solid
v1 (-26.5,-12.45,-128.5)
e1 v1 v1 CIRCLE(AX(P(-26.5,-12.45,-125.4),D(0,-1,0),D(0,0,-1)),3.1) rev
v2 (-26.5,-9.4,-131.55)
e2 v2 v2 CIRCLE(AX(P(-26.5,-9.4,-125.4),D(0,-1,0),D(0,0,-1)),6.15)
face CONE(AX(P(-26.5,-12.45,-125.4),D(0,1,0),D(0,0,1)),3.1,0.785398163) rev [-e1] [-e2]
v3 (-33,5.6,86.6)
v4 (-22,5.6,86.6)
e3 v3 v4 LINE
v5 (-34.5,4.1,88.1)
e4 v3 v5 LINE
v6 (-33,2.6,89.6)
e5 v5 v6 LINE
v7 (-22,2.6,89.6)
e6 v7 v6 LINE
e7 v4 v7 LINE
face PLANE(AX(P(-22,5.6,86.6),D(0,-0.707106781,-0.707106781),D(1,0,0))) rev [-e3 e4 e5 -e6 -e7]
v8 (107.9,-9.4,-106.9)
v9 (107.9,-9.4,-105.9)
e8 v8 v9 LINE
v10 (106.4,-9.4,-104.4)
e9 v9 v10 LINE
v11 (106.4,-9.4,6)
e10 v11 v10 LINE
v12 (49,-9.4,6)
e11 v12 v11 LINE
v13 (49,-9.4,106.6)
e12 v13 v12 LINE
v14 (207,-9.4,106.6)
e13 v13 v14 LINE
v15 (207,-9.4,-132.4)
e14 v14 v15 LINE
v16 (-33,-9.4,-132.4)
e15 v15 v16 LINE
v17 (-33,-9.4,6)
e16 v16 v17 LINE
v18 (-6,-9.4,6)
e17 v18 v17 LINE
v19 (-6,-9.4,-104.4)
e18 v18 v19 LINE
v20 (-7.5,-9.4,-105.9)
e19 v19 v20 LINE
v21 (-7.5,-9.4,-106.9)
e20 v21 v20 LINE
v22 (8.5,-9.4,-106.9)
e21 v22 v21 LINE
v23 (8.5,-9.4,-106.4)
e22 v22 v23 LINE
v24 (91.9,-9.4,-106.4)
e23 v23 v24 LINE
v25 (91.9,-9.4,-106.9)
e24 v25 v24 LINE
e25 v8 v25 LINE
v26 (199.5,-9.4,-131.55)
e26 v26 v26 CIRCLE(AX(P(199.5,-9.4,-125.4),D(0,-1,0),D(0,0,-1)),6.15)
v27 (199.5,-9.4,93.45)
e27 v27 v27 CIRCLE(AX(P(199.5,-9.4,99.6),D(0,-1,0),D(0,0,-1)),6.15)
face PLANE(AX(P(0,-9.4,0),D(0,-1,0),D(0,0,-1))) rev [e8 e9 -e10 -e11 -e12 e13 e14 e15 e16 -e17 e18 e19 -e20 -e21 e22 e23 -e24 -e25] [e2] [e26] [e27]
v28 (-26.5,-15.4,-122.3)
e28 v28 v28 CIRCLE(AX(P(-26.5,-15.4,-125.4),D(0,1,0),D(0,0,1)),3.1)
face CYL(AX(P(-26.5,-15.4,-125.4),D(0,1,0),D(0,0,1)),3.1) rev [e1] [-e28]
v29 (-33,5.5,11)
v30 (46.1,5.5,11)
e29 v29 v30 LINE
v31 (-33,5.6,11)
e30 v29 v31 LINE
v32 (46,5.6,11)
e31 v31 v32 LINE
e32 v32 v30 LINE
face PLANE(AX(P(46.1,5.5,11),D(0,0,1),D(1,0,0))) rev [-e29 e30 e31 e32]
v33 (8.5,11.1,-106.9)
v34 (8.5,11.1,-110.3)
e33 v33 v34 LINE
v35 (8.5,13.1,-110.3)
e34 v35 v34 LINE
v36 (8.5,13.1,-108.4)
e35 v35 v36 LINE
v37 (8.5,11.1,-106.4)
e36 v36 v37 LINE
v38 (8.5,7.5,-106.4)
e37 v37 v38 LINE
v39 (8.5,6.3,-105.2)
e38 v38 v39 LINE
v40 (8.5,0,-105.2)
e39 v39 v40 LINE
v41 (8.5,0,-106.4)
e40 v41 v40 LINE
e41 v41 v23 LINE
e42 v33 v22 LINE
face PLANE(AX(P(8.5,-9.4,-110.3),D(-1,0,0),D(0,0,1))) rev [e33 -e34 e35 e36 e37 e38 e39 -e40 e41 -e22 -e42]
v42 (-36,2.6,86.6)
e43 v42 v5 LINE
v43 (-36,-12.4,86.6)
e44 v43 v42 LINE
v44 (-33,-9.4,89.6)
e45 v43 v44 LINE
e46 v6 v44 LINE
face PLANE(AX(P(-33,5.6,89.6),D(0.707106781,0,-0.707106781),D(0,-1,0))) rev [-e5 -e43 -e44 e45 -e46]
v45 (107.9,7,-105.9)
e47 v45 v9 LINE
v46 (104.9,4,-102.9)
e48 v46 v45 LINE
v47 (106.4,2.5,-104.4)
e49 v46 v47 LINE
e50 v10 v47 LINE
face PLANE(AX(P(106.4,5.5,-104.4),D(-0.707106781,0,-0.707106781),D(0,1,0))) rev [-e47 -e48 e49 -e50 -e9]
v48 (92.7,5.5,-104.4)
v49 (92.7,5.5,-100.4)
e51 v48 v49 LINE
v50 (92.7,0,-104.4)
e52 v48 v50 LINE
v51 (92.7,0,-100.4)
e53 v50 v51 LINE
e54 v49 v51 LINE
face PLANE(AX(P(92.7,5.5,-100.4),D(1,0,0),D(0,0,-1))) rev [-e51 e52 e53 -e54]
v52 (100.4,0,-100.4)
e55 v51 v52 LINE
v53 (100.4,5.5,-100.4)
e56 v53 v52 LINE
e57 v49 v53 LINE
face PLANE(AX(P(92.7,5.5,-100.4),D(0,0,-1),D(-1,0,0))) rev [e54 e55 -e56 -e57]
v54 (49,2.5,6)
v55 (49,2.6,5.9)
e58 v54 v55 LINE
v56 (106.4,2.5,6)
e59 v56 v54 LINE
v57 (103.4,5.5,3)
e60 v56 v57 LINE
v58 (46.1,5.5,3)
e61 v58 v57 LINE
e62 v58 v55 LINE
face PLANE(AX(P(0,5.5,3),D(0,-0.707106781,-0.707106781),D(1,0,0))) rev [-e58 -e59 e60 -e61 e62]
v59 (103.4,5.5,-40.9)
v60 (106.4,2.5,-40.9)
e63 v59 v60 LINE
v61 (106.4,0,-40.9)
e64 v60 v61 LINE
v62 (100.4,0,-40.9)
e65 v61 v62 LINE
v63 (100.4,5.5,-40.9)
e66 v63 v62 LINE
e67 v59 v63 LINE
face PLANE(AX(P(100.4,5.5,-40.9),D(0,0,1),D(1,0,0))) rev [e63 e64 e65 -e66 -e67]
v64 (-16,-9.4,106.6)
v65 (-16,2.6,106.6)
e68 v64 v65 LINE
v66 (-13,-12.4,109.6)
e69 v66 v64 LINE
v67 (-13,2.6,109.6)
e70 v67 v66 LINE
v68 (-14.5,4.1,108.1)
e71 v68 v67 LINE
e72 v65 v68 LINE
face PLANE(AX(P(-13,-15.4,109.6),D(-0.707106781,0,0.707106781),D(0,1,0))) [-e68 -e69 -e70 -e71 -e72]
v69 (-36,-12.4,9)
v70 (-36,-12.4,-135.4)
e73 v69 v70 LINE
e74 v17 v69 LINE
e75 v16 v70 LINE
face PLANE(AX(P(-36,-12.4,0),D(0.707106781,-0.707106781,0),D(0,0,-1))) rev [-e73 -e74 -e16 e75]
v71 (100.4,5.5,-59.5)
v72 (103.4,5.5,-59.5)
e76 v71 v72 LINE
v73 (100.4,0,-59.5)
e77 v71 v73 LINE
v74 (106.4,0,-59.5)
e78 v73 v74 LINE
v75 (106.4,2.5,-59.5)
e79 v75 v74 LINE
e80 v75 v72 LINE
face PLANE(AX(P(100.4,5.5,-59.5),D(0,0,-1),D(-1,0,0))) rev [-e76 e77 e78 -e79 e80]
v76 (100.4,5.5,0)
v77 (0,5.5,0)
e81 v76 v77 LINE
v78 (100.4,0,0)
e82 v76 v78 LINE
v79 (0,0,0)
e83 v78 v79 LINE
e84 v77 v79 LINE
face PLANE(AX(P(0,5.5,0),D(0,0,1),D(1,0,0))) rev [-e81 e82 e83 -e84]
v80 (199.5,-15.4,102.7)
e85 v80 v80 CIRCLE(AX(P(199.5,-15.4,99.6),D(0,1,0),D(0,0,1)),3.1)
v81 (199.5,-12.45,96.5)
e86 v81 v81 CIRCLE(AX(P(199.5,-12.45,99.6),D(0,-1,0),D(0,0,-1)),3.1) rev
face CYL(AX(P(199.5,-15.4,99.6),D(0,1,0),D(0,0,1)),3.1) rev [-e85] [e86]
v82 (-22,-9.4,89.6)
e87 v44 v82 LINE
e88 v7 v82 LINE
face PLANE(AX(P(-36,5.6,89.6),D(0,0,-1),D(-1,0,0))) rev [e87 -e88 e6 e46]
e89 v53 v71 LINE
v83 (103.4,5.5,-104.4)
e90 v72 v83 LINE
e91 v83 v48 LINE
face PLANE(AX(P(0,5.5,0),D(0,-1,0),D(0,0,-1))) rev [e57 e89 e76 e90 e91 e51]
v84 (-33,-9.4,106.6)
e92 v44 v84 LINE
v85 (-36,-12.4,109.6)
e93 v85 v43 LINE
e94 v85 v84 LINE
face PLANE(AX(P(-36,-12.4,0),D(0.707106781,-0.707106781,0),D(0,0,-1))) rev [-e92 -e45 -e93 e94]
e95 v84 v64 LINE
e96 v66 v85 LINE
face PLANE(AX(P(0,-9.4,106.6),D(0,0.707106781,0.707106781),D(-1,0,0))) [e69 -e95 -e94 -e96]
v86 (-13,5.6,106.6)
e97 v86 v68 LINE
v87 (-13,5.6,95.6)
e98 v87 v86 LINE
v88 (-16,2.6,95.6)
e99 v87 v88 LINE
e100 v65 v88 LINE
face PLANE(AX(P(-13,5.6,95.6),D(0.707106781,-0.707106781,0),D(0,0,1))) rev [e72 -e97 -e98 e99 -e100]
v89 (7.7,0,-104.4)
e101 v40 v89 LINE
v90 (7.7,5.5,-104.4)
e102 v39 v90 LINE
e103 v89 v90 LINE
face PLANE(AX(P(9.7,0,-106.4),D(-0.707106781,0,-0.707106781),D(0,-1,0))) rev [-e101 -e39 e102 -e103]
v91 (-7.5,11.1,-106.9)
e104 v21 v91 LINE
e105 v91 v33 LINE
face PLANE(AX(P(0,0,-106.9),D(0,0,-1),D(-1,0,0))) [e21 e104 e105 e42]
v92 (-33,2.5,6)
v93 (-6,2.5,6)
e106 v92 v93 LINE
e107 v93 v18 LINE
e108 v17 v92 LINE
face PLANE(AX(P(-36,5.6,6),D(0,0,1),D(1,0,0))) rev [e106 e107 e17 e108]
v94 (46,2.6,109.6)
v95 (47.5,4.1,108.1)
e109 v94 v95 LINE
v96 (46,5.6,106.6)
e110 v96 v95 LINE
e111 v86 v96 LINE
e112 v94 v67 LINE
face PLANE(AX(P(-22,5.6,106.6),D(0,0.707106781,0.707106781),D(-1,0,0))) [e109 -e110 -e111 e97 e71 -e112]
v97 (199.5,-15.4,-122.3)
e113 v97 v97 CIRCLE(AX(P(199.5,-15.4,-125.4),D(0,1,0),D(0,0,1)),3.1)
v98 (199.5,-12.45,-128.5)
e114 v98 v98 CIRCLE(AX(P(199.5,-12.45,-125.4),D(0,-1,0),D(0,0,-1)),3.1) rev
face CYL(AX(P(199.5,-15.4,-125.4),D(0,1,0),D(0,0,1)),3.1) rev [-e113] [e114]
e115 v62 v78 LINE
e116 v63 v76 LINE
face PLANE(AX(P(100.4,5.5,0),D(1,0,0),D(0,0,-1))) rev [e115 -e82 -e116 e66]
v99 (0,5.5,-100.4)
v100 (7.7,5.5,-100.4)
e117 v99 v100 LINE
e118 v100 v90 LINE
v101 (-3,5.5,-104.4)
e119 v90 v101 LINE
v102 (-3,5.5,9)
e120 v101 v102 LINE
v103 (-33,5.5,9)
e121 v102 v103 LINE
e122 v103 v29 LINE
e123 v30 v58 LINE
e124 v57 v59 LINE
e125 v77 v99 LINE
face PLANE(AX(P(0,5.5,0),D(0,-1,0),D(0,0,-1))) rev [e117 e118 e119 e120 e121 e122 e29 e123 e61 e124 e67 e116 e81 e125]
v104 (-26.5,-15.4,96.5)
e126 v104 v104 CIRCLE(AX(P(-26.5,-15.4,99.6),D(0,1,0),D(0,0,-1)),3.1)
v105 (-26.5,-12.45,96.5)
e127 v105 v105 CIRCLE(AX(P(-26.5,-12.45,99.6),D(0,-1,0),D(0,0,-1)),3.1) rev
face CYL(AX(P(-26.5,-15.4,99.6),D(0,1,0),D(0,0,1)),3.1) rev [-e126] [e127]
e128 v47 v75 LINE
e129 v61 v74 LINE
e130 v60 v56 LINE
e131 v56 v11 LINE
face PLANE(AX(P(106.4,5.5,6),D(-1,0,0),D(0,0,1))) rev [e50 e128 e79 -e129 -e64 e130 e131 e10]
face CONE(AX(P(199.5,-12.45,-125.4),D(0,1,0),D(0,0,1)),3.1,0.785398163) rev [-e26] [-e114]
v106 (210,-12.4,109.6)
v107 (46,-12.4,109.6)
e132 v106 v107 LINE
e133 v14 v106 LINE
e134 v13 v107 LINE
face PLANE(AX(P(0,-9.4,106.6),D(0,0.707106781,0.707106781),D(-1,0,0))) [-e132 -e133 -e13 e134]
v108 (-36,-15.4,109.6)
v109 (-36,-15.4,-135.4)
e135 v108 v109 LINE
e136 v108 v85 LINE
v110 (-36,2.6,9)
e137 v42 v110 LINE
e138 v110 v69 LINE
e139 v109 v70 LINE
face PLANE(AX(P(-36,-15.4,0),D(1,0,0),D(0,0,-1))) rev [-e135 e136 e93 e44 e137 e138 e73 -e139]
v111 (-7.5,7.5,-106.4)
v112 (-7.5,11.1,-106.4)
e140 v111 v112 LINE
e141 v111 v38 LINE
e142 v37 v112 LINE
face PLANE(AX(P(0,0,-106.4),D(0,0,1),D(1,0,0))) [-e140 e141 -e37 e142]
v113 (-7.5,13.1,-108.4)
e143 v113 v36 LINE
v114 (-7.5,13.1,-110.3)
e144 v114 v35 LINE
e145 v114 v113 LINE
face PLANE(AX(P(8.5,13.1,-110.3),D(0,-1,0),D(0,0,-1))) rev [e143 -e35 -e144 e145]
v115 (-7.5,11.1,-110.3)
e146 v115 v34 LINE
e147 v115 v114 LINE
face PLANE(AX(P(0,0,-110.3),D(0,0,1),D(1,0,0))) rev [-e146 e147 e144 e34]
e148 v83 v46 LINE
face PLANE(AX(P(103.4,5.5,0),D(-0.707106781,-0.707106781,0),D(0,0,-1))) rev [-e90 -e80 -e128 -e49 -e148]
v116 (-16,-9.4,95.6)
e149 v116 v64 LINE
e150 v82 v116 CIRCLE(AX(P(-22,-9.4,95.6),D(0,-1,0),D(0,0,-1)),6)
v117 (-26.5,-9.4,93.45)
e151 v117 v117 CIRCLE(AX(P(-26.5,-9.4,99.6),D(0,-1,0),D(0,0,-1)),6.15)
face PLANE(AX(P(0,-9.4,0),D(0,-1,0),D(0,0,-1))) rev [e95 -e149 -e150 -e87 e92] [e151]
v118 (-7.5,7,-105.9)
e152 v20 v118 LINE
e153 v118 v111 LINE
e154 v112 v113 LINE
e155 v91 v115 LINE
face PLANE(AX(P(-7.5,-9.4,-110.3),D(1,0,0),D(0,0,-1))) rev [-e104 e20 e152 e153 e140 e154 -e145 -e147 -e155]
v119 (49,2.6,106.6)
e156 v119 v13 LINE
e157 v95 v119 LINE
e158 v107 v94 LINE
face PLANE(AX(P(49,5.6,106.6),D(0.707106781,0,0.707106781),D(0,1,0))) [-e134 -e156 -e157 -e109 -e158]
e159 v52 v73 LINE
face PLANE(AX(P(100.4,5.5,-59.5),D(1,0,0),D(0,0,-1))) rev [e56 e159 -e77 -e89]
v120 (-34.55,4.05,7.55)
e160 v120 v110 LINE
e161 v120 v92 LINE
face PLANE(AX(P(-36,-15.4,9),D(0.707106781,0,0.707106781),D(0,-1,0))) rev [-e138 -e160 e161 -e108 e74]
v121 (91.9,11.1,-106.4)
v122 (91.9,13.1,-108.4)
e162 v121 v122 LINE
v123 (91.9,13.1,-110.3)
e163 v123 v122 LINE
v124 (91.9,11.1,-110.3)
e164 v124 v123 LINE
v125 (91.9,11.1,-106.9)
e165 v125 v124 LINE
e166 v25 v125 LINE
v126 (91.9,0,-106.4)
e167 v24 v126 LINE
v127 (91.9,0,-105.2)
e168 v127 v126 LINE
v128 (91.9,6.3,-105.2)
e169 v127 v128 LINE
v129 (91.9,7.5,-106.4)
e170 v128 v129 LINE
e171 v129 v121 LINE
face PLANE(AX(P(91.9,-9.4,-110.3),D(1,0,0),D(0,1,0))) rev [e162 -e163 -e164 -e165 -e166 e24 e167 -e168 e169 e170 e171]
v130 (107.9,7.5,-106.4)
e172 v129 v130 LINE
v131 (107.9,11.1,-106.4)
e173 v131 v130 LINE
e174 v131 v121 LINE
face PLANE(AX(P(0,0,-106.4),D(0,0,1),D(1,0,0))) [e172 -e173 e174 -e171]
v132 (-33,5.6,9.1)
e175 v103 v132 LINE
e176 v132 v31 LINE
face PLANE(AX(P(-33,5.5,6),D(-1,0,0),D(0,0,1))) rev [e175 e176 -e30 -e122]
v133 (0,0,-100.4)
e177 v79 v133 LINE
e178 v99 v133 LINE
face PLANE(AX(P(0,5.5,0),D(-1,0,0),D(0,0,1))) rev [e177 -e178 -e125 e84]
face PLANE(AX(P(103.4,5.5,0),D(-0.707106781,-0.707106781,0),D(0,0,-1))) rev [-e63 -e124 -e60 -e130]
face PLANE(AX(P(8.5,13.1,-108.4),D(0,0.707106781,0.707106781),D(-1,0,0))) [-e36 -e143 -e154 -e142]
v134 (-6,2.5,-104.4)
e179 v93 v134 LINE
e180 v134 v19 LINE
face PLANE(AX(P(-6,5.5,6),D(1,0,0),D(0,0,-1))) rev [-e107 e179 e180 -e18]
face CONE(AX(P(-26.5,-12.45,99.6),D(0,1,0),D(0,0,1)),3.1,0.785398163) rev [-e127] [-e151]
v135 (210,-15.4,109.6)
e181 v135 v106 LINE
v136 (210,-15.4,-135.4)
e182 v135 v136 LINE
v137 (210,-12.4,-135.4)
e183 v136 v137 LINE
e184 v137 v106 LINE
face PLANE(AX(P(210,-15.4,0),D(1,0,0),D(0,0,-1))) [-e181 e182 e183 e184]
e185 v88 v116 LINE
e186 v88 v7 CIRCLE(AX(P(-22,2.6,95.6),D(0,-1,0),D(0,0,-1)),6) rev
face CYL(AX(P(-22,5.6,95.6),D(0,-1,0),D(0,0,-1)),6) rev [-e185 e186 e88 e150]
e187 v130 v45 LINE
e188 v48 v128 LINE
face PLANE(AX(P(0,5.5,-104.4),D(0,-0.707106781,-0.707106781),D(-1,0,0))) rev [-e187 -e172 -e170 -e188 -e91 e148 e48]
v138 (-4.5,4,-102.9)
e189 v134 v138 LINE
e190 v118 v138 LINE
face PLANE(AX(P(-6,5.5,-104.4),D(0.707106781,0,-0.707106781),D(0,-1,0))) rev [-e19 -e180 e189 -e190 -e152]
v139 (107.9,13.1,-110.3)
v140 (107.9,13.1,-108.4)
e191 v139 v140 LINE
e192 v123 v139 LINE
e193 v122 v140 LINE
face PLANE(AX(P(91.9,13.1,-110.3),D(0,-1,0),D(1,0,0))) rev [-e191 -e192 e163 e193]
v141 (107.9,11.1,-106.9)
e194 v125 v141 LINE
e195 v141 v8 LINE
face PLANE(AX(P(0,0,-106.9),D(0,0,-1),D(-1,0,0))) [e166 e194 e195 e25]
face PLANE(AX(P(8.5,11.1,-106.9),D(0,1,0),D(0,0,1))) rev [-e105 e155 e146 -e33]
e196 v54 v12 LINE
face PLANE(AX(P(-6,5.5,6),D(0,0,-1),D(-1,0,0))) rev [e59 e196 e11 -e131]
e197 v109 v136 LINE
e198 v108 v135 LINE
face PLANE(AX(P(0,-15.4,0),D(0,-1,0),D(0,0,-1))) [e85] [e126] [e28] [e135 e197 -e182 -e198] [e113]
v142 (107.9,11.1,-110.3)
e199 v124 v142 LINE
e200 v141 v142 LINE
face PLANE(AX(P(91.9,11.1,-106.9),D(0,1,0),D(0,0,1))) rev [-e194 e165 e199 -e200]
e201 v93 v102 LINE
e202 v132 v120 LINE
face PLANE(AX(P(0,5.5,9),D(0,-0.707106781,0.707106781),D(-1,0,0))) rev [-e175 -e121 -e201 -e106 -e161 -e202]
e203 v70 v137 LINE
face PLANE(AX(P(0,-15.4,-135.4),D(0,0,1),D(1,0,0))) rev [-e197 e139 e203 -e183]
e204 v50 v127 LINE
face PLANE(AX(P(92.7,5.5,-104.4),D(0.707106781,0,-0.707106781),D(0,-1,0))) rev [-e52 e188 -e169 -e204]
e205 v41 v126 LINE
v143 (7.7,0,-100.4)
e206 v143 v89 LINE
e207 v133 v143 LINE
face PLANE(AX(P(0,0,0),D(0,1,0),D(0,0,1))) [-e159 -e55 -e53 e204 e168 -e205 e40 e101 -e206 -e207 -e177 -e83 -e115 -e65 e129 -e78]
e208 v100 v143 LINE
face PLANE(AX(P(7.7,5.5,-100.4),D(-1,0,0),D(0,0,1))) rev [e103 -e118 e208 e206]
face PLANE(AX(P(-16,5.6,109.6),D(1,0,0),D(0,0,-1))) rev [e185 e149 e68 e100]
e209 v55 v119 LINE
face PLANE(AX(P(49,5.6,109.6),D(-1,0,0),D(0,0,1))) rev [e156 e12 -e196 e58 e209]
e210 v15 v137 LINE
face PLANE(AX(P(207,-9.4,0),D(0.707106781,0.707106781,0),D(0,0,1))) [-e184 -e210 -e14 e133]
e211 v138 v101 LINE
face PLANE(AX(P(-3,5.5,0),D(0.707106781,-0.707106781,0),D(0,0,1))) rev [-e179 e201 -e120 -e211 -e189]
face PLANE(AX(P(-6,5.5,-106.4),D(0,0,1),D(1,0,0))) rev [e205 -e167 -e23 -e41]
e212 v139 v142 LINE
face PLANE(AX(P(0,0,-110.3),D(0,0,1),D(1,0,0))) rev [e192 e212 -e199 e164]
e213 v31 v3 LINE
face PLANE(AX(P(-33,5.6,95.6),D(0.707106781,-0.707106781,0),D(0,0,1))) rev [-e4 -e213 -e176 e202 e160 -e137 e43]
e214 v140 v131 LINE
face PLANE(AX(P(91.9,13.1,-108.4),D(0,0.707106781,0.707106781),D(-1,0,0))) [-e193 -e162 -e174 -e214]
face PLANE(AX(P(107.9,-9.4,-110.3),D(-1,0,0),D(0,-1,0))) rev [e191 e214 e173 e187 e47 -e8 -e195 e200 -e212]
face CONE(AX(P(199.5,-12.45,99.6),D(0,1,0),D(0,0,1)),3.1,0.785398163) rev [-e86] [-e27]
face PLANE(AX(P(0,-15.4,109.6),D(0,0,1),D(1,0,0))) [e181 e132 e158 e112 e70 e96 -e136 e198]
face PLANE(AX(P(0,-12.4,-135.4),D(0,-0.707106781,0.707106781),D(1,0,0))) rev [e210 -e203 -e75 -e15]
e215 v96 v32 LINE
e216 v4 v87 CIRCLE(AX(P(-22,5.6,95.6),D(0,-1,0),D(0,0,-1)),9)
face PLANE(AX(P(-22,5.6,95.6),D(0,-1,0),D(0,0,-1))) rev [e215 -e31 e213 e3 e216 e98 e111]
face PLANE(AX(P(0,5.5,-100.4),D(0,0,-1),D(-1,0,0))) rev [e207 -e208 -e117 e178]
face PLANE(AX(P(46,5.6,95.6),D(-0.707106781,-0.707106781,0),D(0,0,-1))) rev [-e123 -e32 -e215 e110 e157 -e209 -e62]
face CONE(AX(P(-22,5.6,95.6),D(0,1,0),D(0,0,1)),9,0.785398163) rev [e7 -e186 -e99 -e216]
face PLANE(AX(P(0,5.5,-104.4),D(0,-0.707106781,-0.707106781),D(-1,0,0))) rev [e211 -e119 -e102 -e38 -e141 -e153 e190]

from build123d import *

# Parameters (mm, degrees)
BOSS_EXTRUDE1_DEPTH   = 5.5
BOSS_EXTRUDE1_2_DEPTH = 5.5
SKETCH2_W             = 112.4
SKETCH2_H             = 112.4
BOSS_EXTRUDE2_DEPTH   = 9.4
BOSS_EXTRUDE3_START   = 9.4
SKETCH2_3_W           = 246
SKETCH2_3_H           = 245
BOSS_EXTRUDE3_DEPTH   = 6
SKETCH3_R             = 3.1
CUT_EXTRUDE1_DEPTH    = 251.310147617
BOSS_EXTRUDE4_DEPTH   = 15
SKETCH5_W             = 16
SKETCH5_H             = 22.5
BOSS_EXTRUDE5_DEPTH   = 3.9
SKETCH6_W             = 16
SKETCH6_H             = 20.5
CUT_EXTRUDE2_DEPTH    = 3.4
CHAMFER1_SIZE         = 2
CHAMFER2_SIZE         = 3.05
CHAMFER3_SIZE         = 3
CHAMFER4_SIZE         = 3
SKETCH8_W             = 79.1
SKETCH8_H             = 5
CUT_EXTRUDE3_DEPTH    = 0.1


with BuildPart() as part:
    # Sketch1 → Boss-Extrude1 (new body)
    with BuildSketch(Plane(origin=(0, 0, 0), x_dir=(1, 0, 0), z_dir=(0, 1, 0))):
        Polygon((-6, -6), (-6, 106.4), (7.7, 106.4), (7.7, 100.4), (0, 100.4), (0, 0), (100.4, 0), (100.4, 40.9), (106.4, 40.9), (106.4, -6), align=None)
    extrude(amount=BOSS_EXTRUDE1_DEPTH)



with BuildPart() as body_2:
    # Sketch1 → Boss-Extrude1 2 (new body)
    with BuildSketch(Plane(origin=(0, 0, 0), x_dir=(1, 0, 0), z_dir=(0, 1, 0))):
        Polygon((92.7, 100.4), (92.7, 106.4), (106.4, 106.4), (106.4, 59.5), (100.4, 59.5), (100.4, 100.4), align=None)
    extrude(amount=BOSS_EXTRUDE1_2_DEPTH)


with BuildPart() as part_1:
    add(part.part)

    add(body_2.part)  # Boss-Extrude2 merges body 2
    # Sketch2 → Boss-Extrude2 (add)
    with BuildSketch(Plane.XZ):
        with Locations((50.2, -50.2)):
            Rectangle(SKETCH2_W, SKETCH2_H)
    extrude(amount=BOSS_EXTRUDE2_DEPTH)

    # Sketch2<3> → Boss-Extrude3 (add)
    with BuildSketch(Plane.XZ.offset(BOSS_EXTRUDE3_START)):
        with Locations((87, -12.9)):
            Rectangle(SKETCH2_3_W, SKETCH2_3_H)
    extrude(amount=BOSS_EXTRUDE3_DEPTH)

    # Sketch3 → Cut-Extrude1 (cut, through all)
    with BuildSketch(Plane(origin=(0, -9.4, 0), x_dir=(1, 0, 0), z_dir=(0, 1, 0))):
        with Locations(Location((-26.5, 125.4, 0), (0, 0, 270))):
            Circle(SKETCH3_R)
        with Locations(Location((-26.5, -99.6, 0), (0, 0, 90))):
            Circle(SKETCH3_R)
        with Locations(Location((199.5, 125.4, 0), (0, 0, 270))):
            Circle(SKETCH3_R)
        with Locations(Location((199.5, -99.6, 0), (0, 0, 270))):
            Circle(SKETCH3_R)
    extrude(amount=-CUT_EXTRUDE1_DEPTH, mode=Mode.SUBTRACT)

    # Sketch4 → Boss-Extrude4 (add)
    with BuildSketch(Plane(origin=(0, -9.4, 0), x_dir=(1, 0, 0), z_dir=(0, 1, 0))):
        with BuildLine():
            Line((-16, -109.6), (49, -109.6))
            Line((49, -109.6), (49, -6))
            Line((49, -6), (-36, -6))
            Line((-36, -6), (-36, -89.6))
            Line((-36, -89.6), (-22, -89.6))
            ThreePointArc((-22, -89.6), (-17.757359313, -91.357359313), (-16, -95.6))
            Line((-16, -95.6), (-16, -109.6))
        make_face()
    extrude(amount=BOSS_EXTRUDE4_DEPTH)

    # Sketch5 → Boss-Extrude5 (add)
    with BuildSketch(Plane(origin=(0, 0, -106.4), x_dir=(-1, 0, 0), z_dir=(0, 0, -1))):
        with Locations((-99.9, 1.85)):
            Rectangle(SKETCH5_W, SKETCH5_H)
        with Locations((-0.5, 1.85)):
            Rectangle(SKETCH5_W, SKETCH5_H)
    extrude(amount=BOSS_EXTRUDE5_DEPTH)

    # Sketch6 → Cut-Extrude2 (cut)
    with BuildSketch(Plane(origin=(0, 0, -110.3), x_dir=(-1, 0, 0), z_dir=(0, 0, -1))):
        with Locations((-0.5, 0.85)):
            Rectangle(SKETCH6_W, SKETCH6_H)
        with Locations((-99.9, 0.85)):
            Rectangle(SKETCH6_W, SKETCH6_H)
    extrude(amount=-CUT_EXTRUDE2_DEPTH, mode=Mode.SUBTRACT)

    # Chamfer1
    # the kernel refuses this chamfer: 2 mm, written as the material it adds along each edge
    with BuildSketch(Plane(origin=(92.7, -5.143365976, -106.4), x_dir=(-0.9996219169112968, 0, -0.027495876610589005), z_dir=(0, 1, 0))) as chamfer1_piece_1_section:
        Polygon((CHAMFER1_SIZE * 0.999621916911, CHAMFER1_SIZE * 0.0274958766106), (-CHAMFER1_SIZE * 0.0274958766106, CHAMFER1_SIZE * 0.999621916911), (0, 0), align=None)
    chamfer1_piece_1 = extrude(amount=10.643365976, mode=Mode.PRIVATE)
    chamfer1_piece_1 = split(chamfer1_piece_1, bisect_by=Plane(origin=(91.9, -2.571682988, -105.57221902), z_dir=(1, 0, 0)), keep=Keep.TOP, mode=Mode.PRIVATE)
    add(chamfer1_piece_1)
    with BuildSketch(Plane(origin=(92.7, 5.5, -106.4), x_dir=(0, 0.9996219169112968, -0.027495876610589075), z_dir=(1, 0, 0)), Plane(origin=(-6, 5.5, -106.4), x_dir=(0, 0.9996219169112968, -0.027495876610589075), z_dir=(1, 0, 0))) as chamfer1_piece_2:
        Polygon((CHAMFER1_SIZE * 0.999621916911, CHAMFER1_SIZE * 0.0274958766106), (-CHAMFER1_SIZE * 0.0274958766106, CHAMFER1_SIZE * 0.999621916911), (0, 0), align=None)
    extrude(amount=13.7)
    with BuildSketch(Plane(origin=(106.4, 5.5, -106.4), x_dir=(-0.027495876610589005, 0, 0.9996219169112968), z_dir=(0, -1, 0))) as chamfer1_piece_3_section:
        Polygon((CHAMFER1_SIZE * 0.999621916911, -CHAMFER1_SIZE * 0.0274958766106), (-CHAMFER1_SIZE * 0.0274958766106, -CHAMFER1_SIZE * 0.999621916911), (0, 0), align=None)
    chamfer1_piece_3 = extrude(amount=14.9, mode=Mode.PRIVATE)
    chamfer1_piece_3 = split(chamfer1_piece_3, bisect_by=Plane(origin=(107.9, -1.95, -105.69608178), z_dir=(-1, 0, 0)), keep=Keep.TOP, mode=Mode.PRIVATE)
    add(chamfer1_piece_3)
    with BuildSketch(Plane(origin=(106.4, 5.5, -106.4), x_dir=(-0.027495876610589005, 0, 0.9996219169112968), z_dir=(0, -1, 0))) as chamfer1_piece_4_section:
        Polygon((CHAMFER1_SIZE * 0.999621916911, -CHAMFER1_SIZE * 0.0274958766106), (-CHAMFER1_SIZE * 0.0274958766106, -CHAMFER1_SIZE * 0.999621916911), (0, 0), align=None)
    chamfer1_piece_4 = extrude(amount=20.043365976, mode=Mode.PRIVATE)
    chamfer1_piece_4 = split(chamfer1_piece_4, bisect_by=Plane(origin=(106.974972825, -9.4, -105.69608178), z_dir=(0, -1, 0)), keep=Keep.TOP, mode=Mode.PRIVATE)
    chamfer1_piece_4 = split(chamfer1_piece_4, bisect_by=Plane(origin=(107.9, -11.971682988, -105.69608178), z_dir=(-1, 0, 0)), keep=Keep.TOP, mode=Mode.PRIVATE)
    add(chamfer1_piece_4)
    with BuildSketch(Plane(origin=(106.4, 5.5, -106.4), x_dir=(-0.027495876610589005, 0, 0.9996219169112968), z_dir=(0, -1, 0))) as chamfer1_piece_5_section:
        Polygon((CHAMFER1_SIZE * 0.999621916911, -CHAMFER1_SIZE * 0.0274958766106), (-CHAMFER1_SIZE * 0.0274958766106, -CHAMFER1_SIZE * 0.999621916911), (0, 0), align=None)
    chamfer1_piece_5 = extrude(amount=20.043365976, mode=Mode.PRIVATE)
    chamfer1_piece_5 = split(chamfer1_piece_5, bisect_by=Plane(origin=(108.09753906, -9.4, -106.284213701), z_dir=(0, -1, 0)), keep=Keep.TOP, mode=Mode.PRIVATE)
    chamfer1_piece_5 = split(chamfer1_piece_5, bisect_by=Plane(origin=(107.9, -11.971682988, -106.284213701), z_dir=(1, 0, 0)), keep=Keep.TOP, mode=Mode.PRIVATE)
    add(chamfer1_piece_5)
    with BuildSketch(Plane(origin=(7.7, -5.143365976, -106.4), x_dir=(0.9996219169112965, 0, -0.027495876610589057), z_dir=(0, 1, 0))) as chamfer1_piece_6_section:
        Polygon((CHAMFER1_SIZE * 0.999621916911, -CHAMFER1_SIZE * 0.0274958766106), (-CHAMFER1_SIZE * 0.0274958766106, -CHAMFER1_SIZE * 0.999621916911), (0, 0), align=None)
    chamfer1_piece_6 = extrude(amount=10.643365976, mode=Mode.PRIVATE)
    chamfer1_piece_6 = split(chamfer1_piece_6, bisect_by=Plane(origin=(8.5, -2.571682988, -105.57221902), z_dir=(-1, 0, 0)), keep=Keep.TOP, mode=Mode.PRIVATE)
    add(chamfer1_piece_6)
    with BuildSketch(Plane(origin=(-6, 5.5, -106.4), x_dir=(-0.9996219169112968, 0, -0.027495876610589075), z_dir=(0, -1, 0))) as chamfer1_piece_7_section:
        Polygon((CHAMFER1_SIZE * 0.999621916911, -CHAMFER1_SIZE * 0.0274958766106), (-CHAMFER1_SIZE * 0.0274958766106, -CHAMFER1_SIZE * 0.999621916911), (0, 0), align=None)
    chamfer1_piece_7 = extrude(amount=14.9, mode=Mode.PRIVATE)
    chamfer1_piece_7 = split(chamfer1_piece_7, bisect_by=Plane(origin=(-7.5, -1.95, -105.69608178), z_dir=(1, 0, 0)), keep=Keep.TOP, mode=Mode.PRIVATE)
    add(chamfer1_piece_7)
    with BuildSketch(Plane(origin=(-6, 5.5, -106.4), x_dir=(-0.9996219169112968, 0, -0.027495876610589075), z_dir=(0, -1, 0))) as chamfer1_piece_8_section:
        Polygon((CHAMFER1_SIZE * 0.999621916911, -CHAMFER1_SIZE * 0.0274958766106), (-CHAMFER1_SIZE * 0.0274958766106, -CHAMFER1_SIZE * 0.999621916911), (0, 0), align=None)
    chamfer1_piece_8 = extrude(amount=20.043365976, mode=Mode.PRIVATE)
    chamfer1_piece_8 = split(chamfer1_piece_8, bisect_by=Plane(origin=(-7.69753906, -9.4, -106.284213701), z_dir=(0, -1, 0)), keep=Keep.TOP, mode=Mode.PRIVATE)
    chamfer1_piece_8 = split(chamfer1_piece_8, bisect_by=Plane(origin=(-7.5, -11.971682988, -106.284213701), z_dir=(-1, 0, 0)), keep=Keep.TOP, mode=Mode.PRIVATE)
    add(chamfer1_piece_8)
    with BuildSketch(Plane(origin=(-6, 5.5, -106.4), x_dir=(-0.9996219169112968, 0, -0.027495876610589075), z_dir=(0, -1, 0))) as chamfer1_piece_9_section:
        Polygon((CHAMFER1_SIZE * 0.999621916911, -CHAMFER1_SIZE * 0.0274958766106), (-CHAMFER1_SIZE * 0.0274958766106, -CHAMFER1_SIZE * 0.999621916911), (0, 0), align=None)
    chamfer1_piece_9 = extrude(amount=20.043365976, mode=Mode.PRIVATE)
    chamfer1_piece_9 = split(chamfer1_piece_9, bisect_by=Plane(origin=(-6.574972825, -9.4, -105.69608178), z_dir=(0, -1, 0)), keep=Keep.TOP, mode=Mode.PRIVATE)
    chamfer1_piece_9 = split(chamfer1_piece_9, bisect_by=Plane(origin=(-7.5, -11.971682988, -105.69608178), z_dir=(1, 0, 0)), keep=Keep.TOP, mode=Mode.PRIVATE)
    add(chamfer1_piece_9)
    with BuildSketch(Plane(origin=(87.556634024, 5.5, -106.4), x_dir=(0, 0.9996219169112968, -0.027495876610589075), z_dir=(1, 0, 0))) as chamfer1_piece_10a_section:
        Polygon((CHAMFER1_SIZE * 0.999621916911, CHAMFER1_SIZE * 0.0274958766106), (-CHAMFER1_SIZE * 0.0274958766106, CHAMFER1_SIZE * 0.999621916911), (0, 0), align=None)
    chamfer1_piece_10a = extrude(amount=18.843365976, mode=Mode.PRIVATE)
    chamfer1_piece_10a = split(chamfer1_piece_10a, bisect_by=Plane(origin=(91.9, 6.159587254, -105.740412746), z_dir=(1, 0, 0)), keep=Keep.TOP, mode=Mode.PRIVATE)
    chamfer1_piece_10a = split(chamfer1_piece_10a, bisect_by=Plane(origin=(92.7, 6.159587254, -105.740412746), z_dir=(-1, 0, 0)), keep=Keep.TOP, mode=Mode.PRIVATE)
    with BuildSketch(Plane(origin=(92.7, 0, -106.4), x_dir=(-0.9996219169112968, 0, -0.027495876610589005), z_dir=(0, 1, 0))) as chamfer1_piece_10b_section:
        Polygon((CHAMFER1_SIZE * 0.999621916911, CHAMFER1_SIZE * 0.0274958766106), (-CHAMFER1_SIZE * 0.0274958766106, CHAMFER1_SIZE * 0.999621916911), (0, 0), align=None)
    chamfer1_piece_10b = extrude(amount=10.643365976, mode=Mode.PRIVATE)
    chamfer1_piece_10b = split(chamfer1_piece_10b, bisect_by=Plane(origin=(91.9, 8.071682988, -105.57221902), z_dir=(1, 0, 0)), keep=Keep.TOP, mode=Mode.PRIVATE)
    chamfer1_piece_10b = split(chamfer1_piece_10b, bisect_by=Plane(origin=(92.36112716, 5.5, -105.57221902), z_dir=(0, 1, 0)), keep=Keep.TOP, mode=Mode.PRIVATE)
    chamfer1_piece_10 = chamfer1_piece_10a & chamfer1_piece_10b
    add(chamfer1_piece_10)
    with BuildSketch(Plane(origin=(106.4, 10.643365976, -106.4), x_dir=(-0.027495876610589005, 0, 0.9996219169112968), z_dir=(0, -1, 0))) as chamfer1_piece_11a_section:
        Polygon((CHAMFER1_SIZE * 0.999621916911, -CHAMFER1_SIZE * 0.0274958766106), (-CHAMFER1_SIZE * 0.0274958766106, -CHAMFER1_SIZE * 0.999621916911), (0, 0), align=None)
    chamfer1_piece_11a = extrude(amount=20.043365976, mode=Mode.PRIVATE)
    chamfer1_piece_11a = split(chamfer1_piece_11a, bisect_by=Plane(origin=(106.974972825, 5.5, -105.69608178), z_dir=(0, 1, 0)), keep=Keep.TOP, mode=Mode.PRIVATE)
    chamfer1_piece_11a = split(chamfer1_piece_11a, bisect_by=Plane(origin=(107.9, 8.071682988, -105.69608178), z_dir=(-1, 0, 0)), keep=Keep.TOP, mode=Mode.PRIVATE)
    with BuildSketch(Plane(origin=(92.7, 5.5, -106.4), x_dir=(0, 0.9996219169112968, -0.027495876610589075), z_dir=(1, 0, 0))) as chamfer1_piece_11b_section:
        Polygon((CHAMFER1_SIZE * 0.999621916911, CHAMFER1_SIZE * 0.0274958766106), (-CHAMFER1_SIZE * 0.0274958766106, CHAMFER1_SIZE * 0.999621916911), (0, 0), align=None)
    chamfer1_piece_11b = extrude(amount=18.843365976, mode=Mode.PRIVATE)
    chamfer1_piece_11b = split(chamfer1_piece_11b, bisect_by=Plane(origin=(106.4, 6.159587254, -105.740412746), z_dir=(1, 0, 0)), keep=Keep.TOP, mode=Mode.PRIVATE)
    chamfer1_piece_11b = split(chamfer1_piece_11b, bisect_by=Plane(origin=(107.9, 6.159587254, -105.740412746), z_dir=(-1, 0, 0)), keep=Keep.TOP, mode=Mode.PRIVATE)
    chamfer1_piece_11 = chamfer1_piece_11a & chamfer1_piece_11b
    add(chamfer1_piece_11)
    with BuildSketch(Plane(origin=(-6, 5.5, -106.4), x_dir=(0, 0.9996219169112968, -0.027495876610589075), z_dir=(1, 0, 0))) as chamfer1_piece_12a_section:
        Polygon((CHAMFER1_SIZE * 0.999621916911, CHAMFER1_SIZE * 0.0274958766106), (-CHAMFER1_SIZE * 0.0274958766106, CHAMFER1_SIZE * 0.999621916911), (0, 0), align=None)
    chamfer1_piece_12a = extrude(amount=18.843365976, mode=Mode.PRIVATE)
    chamfer1_piece_12a = split(chamfer1_piece_12a, bisect_by=Plane(origin=(8.5, 6.159587254, -105.740412746), z_dir=(-1, 0, 0)), keep=Keep.TOP, mode=Mode.PRIVATE)
    chamfer1_piece_12a = split(chamfer1_piece_12a, bisect_by=Plane(origin=(7.7, 6.159587254, -105.740412746), z_dir=(1, 0, 0)), keep=Keep.TOP, mode=Mode.PRIVATE)
    with BuildSketch(Plane(origin=(7.7, 0, -106.4), x_dir=(0.9996219169112965, 0, -0.027495876610589057), z_dir=(0, 1, 0))) as chamfer1_piece_12b_section:
        Polygon((CHAMFER1_SIZE * 0.999621916911, -CHAMFER1_SIZE * 0.0274958766106), (-CHAMFER1_SIZE * 0.0274958766106, -CHAMFER1_SIZE * 0.999621916911), (0, 0), align=None)
    chamfer1_piece_12b = extrude(amount=10.643365976, mode=Mode.PRIVATE)
    chamfer1_piece_12b = split(chamfer1_piece_12b, bisect_by=Plane(origin=(8.5, 8.071682988, -105.57221902), z_dir=(-1, 0, 0)), keep=Keep.TOP, mode=Mode.PRIVATE)
    chamfer1_piece_12b = split(chamfer1_piece_12b, bisect_by=Plane(origin=(8.03887284, 5.5, -105.57221902), z_dir=(0, 1, 0)), keep=Keep.TOP, mode=Mode.PRIVATE)
    chamfer1_piece_12 = chamfer1_piece_12a & chamfer1_piece_12b
    add(chamfer1_piece_12)
    with BuildSketch(Plane(origin=(-6, 10.643365976, -106.4), x_dir=(-0.9996219169112968, 0, -0.027495876610589075), z_dir=(0, -1, 0))) as chamfer1_piece_13a_section:
        Polygon((CHAMFER1_SIZE * 0.999621916911, -CHAMFER1_SIZE * 0.0274958766106), (-CHAMFER1_SIZE * 0.0274958766106, -CHAMFER1_SIZE * 0.999621916911), (0, 0), align=None)
    chamfer1_piece_13a = extrude(amount=20.043365976, mode=Mode.PRIVATE)
    chamfer1_piece_13a = split(chamfer1_piece_13a, bisect_by=Plane(origin=(-7.5, 8.071682988, -105.69608178), z_dir=(1, 0, 0)), keep=Keep.TOP, mode=Mode.PRIVATE)
    chamfer1_piece_13a = split(chamfer1_piece_13a, bisect_by=Plane(origin=(-6.574972825, 5.5, -105.69608178), z_dir=(0, 1, 0)), keep=Keep.TOP, mode=Mode.PRIVATE)
    with BuildSketch(Plane(origin=(-11.143365976, 5.5, -106.4), x_dir=(0, 0.9996219169112968, -0.027495876610589075), z_dir=(1, 0, 0))) as chamfer1_piece_13b_section:
        Polygon((CHAMFER1_SIZE * 0.999621916911, CHAMFER1_SIZE * 0.0274958766106), (-CHAMFER1_SIZE * 0.0274958766106, CHAMFER1_SIZE * 0.999621916911), (0, 0), align=None)
    chamfer1_piece_13b = extrude(amount=18.843365976, mode=Mode.PRIVATE)
    chamfer1_piece_13b = split(chamfer1_piece_13b, bisect_by=Plane(origin=(-7.5, 6.159587254, -105.740412746), z_dir=(1, 0, 0)), keep=Keep.TOP, mode=Mode.PRIVATE)
    chamfer1_piece_13b = split(chamfer1_piece_13b, bisect_by=Plane(origin=(-6, 6.159587254, -105.740412746), z_dir=(-1, 0, 0)), keep=Keep.TOP, mode=Mode.PRIVATE)
    chamfer1_piece_13 = chamfer1_piece_13a & chamfer1_piece_13b
    add(chamfer1_piece_13)
    # the kernel refuses this chamfer: 2 mm, written as the material it takes off along each edge
    with BuildSketch(Plane(origin=(113.043365976, 13.1, -106.4), x_dir=(1.4427442484973125e-15, -0.9996219169112968, 0.027495876610589075), z_dir=(-1, 0, 0)), Plane(origin=(-12.643365976, 13.1, -106.4), x_dir=(0, 0.027495876610586414, -0.9996219169112968), z_dir=(1, 0, 0))) as chamfer1_2_piece_1:
        Polygon((CHAMFER1_SIZE * 0.999621916911, -CHAMFER1_SIZE * 0.0274958766106), (-CHAMFER1_SIZE * 0.0274958766106, -CHAMFER1_SIZE * 0.999621916911), (0, 0), align=None)
    extrude(amount=26.286731952, mode=Mode.SUBTRACT)

    # Chamfer2
    chamfer2_edges = [part_1.edges().sort_by_distance(p)[0] for p in [
        (199.5, -9.4, -128.5),
        (-26.5, -9.4, -128.5),
        (-26.5, -9.4, 102.7),
        (199.5, -9.4, 96.5),
    ]]
    chamfer(chamfer2_edges, length=CHAMFER2_SIZE)

    # Chamfer3
    chamfer3_edges = [part_1.edges().sort_by_distance(p)[0] for p in [
        (106.4, 5.5, -17.45),
    ]]
    chamfer(chamfer3_edges, length=CHAMFER3_SIZE)
    chamfer3_2_edges = [part_1.edges().sort_by_distance(p)[0] for p in [
        (106.4, 5.5, -81.95),
    ]]
    chamfer(chamfer3_2_edges, length=CHAMFER3_SIZE)
    chamfer3_3_edges = [part_1.edges().sort_by_distance(p)[0] for p in [
        (76.2, 5.5, 6),
    ]]
    chamfer(chamfer3_3_edges, length=CHAMFER3_SIZE)
    chamfer3_4_edges = [part_1.edges().sort_by_distance(p)[0] for p in [
        (49, 5.6, 57.8),
    ]]
    chamfer(chamfer3_4_edges, length=CHAMFER3_SIZE)
    chamfer3_5_edges = [part_1.edges().sort_by_distance(p)[0] for p in [
        (15, 5.6, 109.6),
    ]]
    chamfer(chamfer3_5_edges, length=CHAMFER3_SIZE)
    chamfer3_6_edges = [part_1.edges().sort_by_distance(p)[0] for p in [
        (-36, 5.6, 47.8),
    ]]
    chamfer(chamfer3_6_edges, length=CHAMFER3_SIZE)
    chamfer3_7_edges = [part_1.edges().sort_by_distance(p)[0] for p in [
        (-6, 5.5, -49.2),
    ]]
    chamfer(chamfer3_7_edges, length=CHAMFER3_SIZE)
    chamfer3_8_edges = [part_1.edges().sort_by_distance(p)[0] for p in [
        (-16, 5.6, 101.1),
        (-27.5, 5.6, 89.6),
        (-17.757359313, 5.6, 91.357359313),
    ]]
    chamfer(chamfer3_8_edges, length=CHAMFER3_SIZE)

    # Chamfer4
    chamfer4_edges = [part_1.edges().sort_by_distance(p)[0] for p in [
        (-36, -9.4, -64.7),
        (129.5, -9.4, 109.6),
        (-36, -3.4, 89.6),
        (-36, -3.4, 6),
        (-16, -3.4, 109.6),
        (49, -3.4, 109.6),
        (-36, -9.4, 99.6),
        (87, -9.4, -135.4),
        (-26, -9.4, 109.6),
        (210, -9.4, -12.9),
    ]]
    chamfer(chamfer4_edges, length=CHAMFER4_SIZE)

    # Sketch8 → Cut-Extrude3 (cut)
    with BuildSketch(Plane(origin=(0, 5.6, 0), x_dir=(1, 0, 0), z_dir=(0, 1, 0))):
        with Locations((6.55, -8.5)):
            Rectangle(SKETCH8_W, SKETCH8_H)
    extrude(amount=-CUT_EXTRUDE3_DEPTH, mode=Mode.SUBTRACT)

    # Chamfer5
    # the kernel refuses this chamfer: 3 mm, written as the material it takes off along each edge
    with BuildSketch(Plane(origin=(6.229157809, 5.5, 6), x_dir=(0, -0.9850292351397439, -0.17238737169529297), z_dir=(-1, 0, 0))) as chamfer5_piece_1_section:
        with BuildLine():
            Line((3.691663124, 0), (-1.253737533, 3.472249821))
            Line((-1.253737533, 3.472249821), (-1.697000689, 3.394675503))
            ThreePointArc((-1.697000689, 3.394675503), (-0.756697539, 1.713403919), (-0.443263156, -0.077574317))
            Line((-0.443263156, -0.077574317), (0.077574317, -0.443263156))
            ThreePointArc((0.077574317, -0.443263156), (1.868552553, -0.129828772), (3.769237441, -0.443263156))
            Line((3.769237441, -0.443263156), (3.691663124, 0))
        make_face()
    chamfer5_piece_1 = extrude(amount=39.229157809, mode=Mode.PRIVATE)
    chamfer5_piece_1 = split(chamfer5_piece_1, bisect_by=Plane(origin=(-4.039459416, 4.460540584, 7.280331392), z_dir=(-0.7071067811865476, 0.7071067811865476, 0)), keep=Keep.TOP, mode=Mode.PRIVATE)
    chamfer5_piece_1 = split(chamfer5_piece_1, bisect_by=Plane(origin=(-6, 5.114054112, 7.280331392), z_dir=(1, 0, 0)), keep=Keep.TOP, mode=Mode.PRIVATE)
    add(chamfer5_piece_1, mode=Mode.SUBTRACT)
    with BuildSketch(Plane(origin=(6.229157809, 5.5, 6), x_dir=(0, -0.9850292351397439, -0.17238737169529297), z_dir=(-1, 0, 0))) as chamfer5_piece_2_section:
        with BuildLine():
            Line((3.691663124, 0), (-1.253737533, 3.472249821))
            Line((-1.253737533, 3.472249821), (-1.697000689, 3.394675503))
            ThreePointArc((-1.697000689, 3.394675503), (-0.756697539, 1.713403919), (-0.443263156, -0.077574317))
            Line((-0.443263156, -0.077574317), (0.077574317, -0.443263156))
            ThreePointArc((0.077574317, -0.443263156), (1.868552553, -0.129828772), (3.769237441, -0.443263156))
            Line((3.769237441, -0.443263156), (3.691663124, 0))
        make_face()
    chamfer5_piece_2 = extrude(amount=39.229157809, mode=Mode.PRIVATE)
    chamfer5_piece_2 = split(chamfer5_piece_2, bisect_by=Plane(origin=(-6.302738925, 2.197261075, 5.315019574), z_dir=(0.7071067811865476, -0.7071067811865476, 0)), keep=Keep.TOP, mode=Mode.PRIVATE)
    chamfer5_piece_2 = split(chamfer5_piece_2, bisect_by=Plane(origin=(-6, 2.0963481, 5.315019574), z_dir=(-1, 0, 0)), keep=Keep.TOP, mode=Mode.PRIVATE)
    add(chamfer5_piece_2, mode=Mode.SUBTRACT)
    with BuildSketch(Plane(origin=(6.229157809, 5.5, 6), x_dir=(0, -0.9850292351397439, -0.17238737169529297), z_dir=(-1, 0, 0))) as chamfer5_piece_3_section:
        with BuildLine():
            Line((3.691663124, 0), (-1.253737533, 3.472249821))
            Line((-1.253737533, 3.472249821), (-1.697000689, 3.394675503))
            ThreePointArc((-1.697000689, 3.394675503), (-0.756697539, 1.713403919), (-0.443263156, -0.077574317))
            Line((-0.443263156, -0.077574317), (0.077574317, -0.443263156))
            ThreePointArc((0.077574317, -0.443263156), (1.868552553, -0.129828772), (3.769237441, -0.443263156))
            Line((3.769237441, -0.443263156), (3.691663124, 0))
        make_face()
    chamfer5_piece_3 = extrude(amount=39.229157809, mode=Mode.PRIVATE)
    chamfer5_piece_3 = split(chamfer5_piece_3, bisect_by=Plane(origin=(-11.711520685, -3.211520685, 6.918404597), z_dir=(-0.7071067811865476, 0.7071067811865476, 0)), keep=Keep.TOP, mode=Mode.PRIVATE)
    chamfer5_piece_3 = split(chamfer5_piece_3, bisect_by=Plane(origin=(-6, 4.583653926, 6.918404597), z_dir=(-1, 0, 0)), keep=Keep.TOP, mode=Mode.PRIVATE)
    add(chamfer5_piece_3, mode=Mode.SUBTRACT)
    with BuildSketch(Plane(origin=(6.229157809, 5.5, 6), x_dir=(0, -0.9850292351397439, -0.17238737169529297), z_dir=(-1, 0, 0))) as chamfer5_piece_4_section:
        with BuildLine():
            Line((3.691663124, 0), (-1.253737533, 3.472249821))
            Line((-1.253737533, 3.472249821), (-1.697000689, 3.394675503))
            ThreePointArc((-1.697000689, 3.394675503), (-0.756697539, 1.713403919), (-0.443263156, -0.077574317))
            Line((-0.443263156, -0.077574317), (0.077574317, -0.443263156))
            ThreePointArc((0.077574317, -0.443263156), (1.868552553, -0.129828772), (3.769237441, -0.443263156))
            Line((3.769237441, -0.443263156), (3.691663124, 0))
        make_face()
    chamfer5_piece_4 = extrude(amount=48.458315618, mode=Mode.PRIVATE)
    chamfer5_piece_4 = split(chamfer5_piece_4, bisect_by=Plane(origin=(-33, 4.582402261, 6.917597739), z_dir=(-1, 0, 0)), keep=Keep.TOP, mode=Mode.PRIVATE)
    add(chamfer5_piece_4, mode=Mode.SUBTRACT)


solid = part_1.part
